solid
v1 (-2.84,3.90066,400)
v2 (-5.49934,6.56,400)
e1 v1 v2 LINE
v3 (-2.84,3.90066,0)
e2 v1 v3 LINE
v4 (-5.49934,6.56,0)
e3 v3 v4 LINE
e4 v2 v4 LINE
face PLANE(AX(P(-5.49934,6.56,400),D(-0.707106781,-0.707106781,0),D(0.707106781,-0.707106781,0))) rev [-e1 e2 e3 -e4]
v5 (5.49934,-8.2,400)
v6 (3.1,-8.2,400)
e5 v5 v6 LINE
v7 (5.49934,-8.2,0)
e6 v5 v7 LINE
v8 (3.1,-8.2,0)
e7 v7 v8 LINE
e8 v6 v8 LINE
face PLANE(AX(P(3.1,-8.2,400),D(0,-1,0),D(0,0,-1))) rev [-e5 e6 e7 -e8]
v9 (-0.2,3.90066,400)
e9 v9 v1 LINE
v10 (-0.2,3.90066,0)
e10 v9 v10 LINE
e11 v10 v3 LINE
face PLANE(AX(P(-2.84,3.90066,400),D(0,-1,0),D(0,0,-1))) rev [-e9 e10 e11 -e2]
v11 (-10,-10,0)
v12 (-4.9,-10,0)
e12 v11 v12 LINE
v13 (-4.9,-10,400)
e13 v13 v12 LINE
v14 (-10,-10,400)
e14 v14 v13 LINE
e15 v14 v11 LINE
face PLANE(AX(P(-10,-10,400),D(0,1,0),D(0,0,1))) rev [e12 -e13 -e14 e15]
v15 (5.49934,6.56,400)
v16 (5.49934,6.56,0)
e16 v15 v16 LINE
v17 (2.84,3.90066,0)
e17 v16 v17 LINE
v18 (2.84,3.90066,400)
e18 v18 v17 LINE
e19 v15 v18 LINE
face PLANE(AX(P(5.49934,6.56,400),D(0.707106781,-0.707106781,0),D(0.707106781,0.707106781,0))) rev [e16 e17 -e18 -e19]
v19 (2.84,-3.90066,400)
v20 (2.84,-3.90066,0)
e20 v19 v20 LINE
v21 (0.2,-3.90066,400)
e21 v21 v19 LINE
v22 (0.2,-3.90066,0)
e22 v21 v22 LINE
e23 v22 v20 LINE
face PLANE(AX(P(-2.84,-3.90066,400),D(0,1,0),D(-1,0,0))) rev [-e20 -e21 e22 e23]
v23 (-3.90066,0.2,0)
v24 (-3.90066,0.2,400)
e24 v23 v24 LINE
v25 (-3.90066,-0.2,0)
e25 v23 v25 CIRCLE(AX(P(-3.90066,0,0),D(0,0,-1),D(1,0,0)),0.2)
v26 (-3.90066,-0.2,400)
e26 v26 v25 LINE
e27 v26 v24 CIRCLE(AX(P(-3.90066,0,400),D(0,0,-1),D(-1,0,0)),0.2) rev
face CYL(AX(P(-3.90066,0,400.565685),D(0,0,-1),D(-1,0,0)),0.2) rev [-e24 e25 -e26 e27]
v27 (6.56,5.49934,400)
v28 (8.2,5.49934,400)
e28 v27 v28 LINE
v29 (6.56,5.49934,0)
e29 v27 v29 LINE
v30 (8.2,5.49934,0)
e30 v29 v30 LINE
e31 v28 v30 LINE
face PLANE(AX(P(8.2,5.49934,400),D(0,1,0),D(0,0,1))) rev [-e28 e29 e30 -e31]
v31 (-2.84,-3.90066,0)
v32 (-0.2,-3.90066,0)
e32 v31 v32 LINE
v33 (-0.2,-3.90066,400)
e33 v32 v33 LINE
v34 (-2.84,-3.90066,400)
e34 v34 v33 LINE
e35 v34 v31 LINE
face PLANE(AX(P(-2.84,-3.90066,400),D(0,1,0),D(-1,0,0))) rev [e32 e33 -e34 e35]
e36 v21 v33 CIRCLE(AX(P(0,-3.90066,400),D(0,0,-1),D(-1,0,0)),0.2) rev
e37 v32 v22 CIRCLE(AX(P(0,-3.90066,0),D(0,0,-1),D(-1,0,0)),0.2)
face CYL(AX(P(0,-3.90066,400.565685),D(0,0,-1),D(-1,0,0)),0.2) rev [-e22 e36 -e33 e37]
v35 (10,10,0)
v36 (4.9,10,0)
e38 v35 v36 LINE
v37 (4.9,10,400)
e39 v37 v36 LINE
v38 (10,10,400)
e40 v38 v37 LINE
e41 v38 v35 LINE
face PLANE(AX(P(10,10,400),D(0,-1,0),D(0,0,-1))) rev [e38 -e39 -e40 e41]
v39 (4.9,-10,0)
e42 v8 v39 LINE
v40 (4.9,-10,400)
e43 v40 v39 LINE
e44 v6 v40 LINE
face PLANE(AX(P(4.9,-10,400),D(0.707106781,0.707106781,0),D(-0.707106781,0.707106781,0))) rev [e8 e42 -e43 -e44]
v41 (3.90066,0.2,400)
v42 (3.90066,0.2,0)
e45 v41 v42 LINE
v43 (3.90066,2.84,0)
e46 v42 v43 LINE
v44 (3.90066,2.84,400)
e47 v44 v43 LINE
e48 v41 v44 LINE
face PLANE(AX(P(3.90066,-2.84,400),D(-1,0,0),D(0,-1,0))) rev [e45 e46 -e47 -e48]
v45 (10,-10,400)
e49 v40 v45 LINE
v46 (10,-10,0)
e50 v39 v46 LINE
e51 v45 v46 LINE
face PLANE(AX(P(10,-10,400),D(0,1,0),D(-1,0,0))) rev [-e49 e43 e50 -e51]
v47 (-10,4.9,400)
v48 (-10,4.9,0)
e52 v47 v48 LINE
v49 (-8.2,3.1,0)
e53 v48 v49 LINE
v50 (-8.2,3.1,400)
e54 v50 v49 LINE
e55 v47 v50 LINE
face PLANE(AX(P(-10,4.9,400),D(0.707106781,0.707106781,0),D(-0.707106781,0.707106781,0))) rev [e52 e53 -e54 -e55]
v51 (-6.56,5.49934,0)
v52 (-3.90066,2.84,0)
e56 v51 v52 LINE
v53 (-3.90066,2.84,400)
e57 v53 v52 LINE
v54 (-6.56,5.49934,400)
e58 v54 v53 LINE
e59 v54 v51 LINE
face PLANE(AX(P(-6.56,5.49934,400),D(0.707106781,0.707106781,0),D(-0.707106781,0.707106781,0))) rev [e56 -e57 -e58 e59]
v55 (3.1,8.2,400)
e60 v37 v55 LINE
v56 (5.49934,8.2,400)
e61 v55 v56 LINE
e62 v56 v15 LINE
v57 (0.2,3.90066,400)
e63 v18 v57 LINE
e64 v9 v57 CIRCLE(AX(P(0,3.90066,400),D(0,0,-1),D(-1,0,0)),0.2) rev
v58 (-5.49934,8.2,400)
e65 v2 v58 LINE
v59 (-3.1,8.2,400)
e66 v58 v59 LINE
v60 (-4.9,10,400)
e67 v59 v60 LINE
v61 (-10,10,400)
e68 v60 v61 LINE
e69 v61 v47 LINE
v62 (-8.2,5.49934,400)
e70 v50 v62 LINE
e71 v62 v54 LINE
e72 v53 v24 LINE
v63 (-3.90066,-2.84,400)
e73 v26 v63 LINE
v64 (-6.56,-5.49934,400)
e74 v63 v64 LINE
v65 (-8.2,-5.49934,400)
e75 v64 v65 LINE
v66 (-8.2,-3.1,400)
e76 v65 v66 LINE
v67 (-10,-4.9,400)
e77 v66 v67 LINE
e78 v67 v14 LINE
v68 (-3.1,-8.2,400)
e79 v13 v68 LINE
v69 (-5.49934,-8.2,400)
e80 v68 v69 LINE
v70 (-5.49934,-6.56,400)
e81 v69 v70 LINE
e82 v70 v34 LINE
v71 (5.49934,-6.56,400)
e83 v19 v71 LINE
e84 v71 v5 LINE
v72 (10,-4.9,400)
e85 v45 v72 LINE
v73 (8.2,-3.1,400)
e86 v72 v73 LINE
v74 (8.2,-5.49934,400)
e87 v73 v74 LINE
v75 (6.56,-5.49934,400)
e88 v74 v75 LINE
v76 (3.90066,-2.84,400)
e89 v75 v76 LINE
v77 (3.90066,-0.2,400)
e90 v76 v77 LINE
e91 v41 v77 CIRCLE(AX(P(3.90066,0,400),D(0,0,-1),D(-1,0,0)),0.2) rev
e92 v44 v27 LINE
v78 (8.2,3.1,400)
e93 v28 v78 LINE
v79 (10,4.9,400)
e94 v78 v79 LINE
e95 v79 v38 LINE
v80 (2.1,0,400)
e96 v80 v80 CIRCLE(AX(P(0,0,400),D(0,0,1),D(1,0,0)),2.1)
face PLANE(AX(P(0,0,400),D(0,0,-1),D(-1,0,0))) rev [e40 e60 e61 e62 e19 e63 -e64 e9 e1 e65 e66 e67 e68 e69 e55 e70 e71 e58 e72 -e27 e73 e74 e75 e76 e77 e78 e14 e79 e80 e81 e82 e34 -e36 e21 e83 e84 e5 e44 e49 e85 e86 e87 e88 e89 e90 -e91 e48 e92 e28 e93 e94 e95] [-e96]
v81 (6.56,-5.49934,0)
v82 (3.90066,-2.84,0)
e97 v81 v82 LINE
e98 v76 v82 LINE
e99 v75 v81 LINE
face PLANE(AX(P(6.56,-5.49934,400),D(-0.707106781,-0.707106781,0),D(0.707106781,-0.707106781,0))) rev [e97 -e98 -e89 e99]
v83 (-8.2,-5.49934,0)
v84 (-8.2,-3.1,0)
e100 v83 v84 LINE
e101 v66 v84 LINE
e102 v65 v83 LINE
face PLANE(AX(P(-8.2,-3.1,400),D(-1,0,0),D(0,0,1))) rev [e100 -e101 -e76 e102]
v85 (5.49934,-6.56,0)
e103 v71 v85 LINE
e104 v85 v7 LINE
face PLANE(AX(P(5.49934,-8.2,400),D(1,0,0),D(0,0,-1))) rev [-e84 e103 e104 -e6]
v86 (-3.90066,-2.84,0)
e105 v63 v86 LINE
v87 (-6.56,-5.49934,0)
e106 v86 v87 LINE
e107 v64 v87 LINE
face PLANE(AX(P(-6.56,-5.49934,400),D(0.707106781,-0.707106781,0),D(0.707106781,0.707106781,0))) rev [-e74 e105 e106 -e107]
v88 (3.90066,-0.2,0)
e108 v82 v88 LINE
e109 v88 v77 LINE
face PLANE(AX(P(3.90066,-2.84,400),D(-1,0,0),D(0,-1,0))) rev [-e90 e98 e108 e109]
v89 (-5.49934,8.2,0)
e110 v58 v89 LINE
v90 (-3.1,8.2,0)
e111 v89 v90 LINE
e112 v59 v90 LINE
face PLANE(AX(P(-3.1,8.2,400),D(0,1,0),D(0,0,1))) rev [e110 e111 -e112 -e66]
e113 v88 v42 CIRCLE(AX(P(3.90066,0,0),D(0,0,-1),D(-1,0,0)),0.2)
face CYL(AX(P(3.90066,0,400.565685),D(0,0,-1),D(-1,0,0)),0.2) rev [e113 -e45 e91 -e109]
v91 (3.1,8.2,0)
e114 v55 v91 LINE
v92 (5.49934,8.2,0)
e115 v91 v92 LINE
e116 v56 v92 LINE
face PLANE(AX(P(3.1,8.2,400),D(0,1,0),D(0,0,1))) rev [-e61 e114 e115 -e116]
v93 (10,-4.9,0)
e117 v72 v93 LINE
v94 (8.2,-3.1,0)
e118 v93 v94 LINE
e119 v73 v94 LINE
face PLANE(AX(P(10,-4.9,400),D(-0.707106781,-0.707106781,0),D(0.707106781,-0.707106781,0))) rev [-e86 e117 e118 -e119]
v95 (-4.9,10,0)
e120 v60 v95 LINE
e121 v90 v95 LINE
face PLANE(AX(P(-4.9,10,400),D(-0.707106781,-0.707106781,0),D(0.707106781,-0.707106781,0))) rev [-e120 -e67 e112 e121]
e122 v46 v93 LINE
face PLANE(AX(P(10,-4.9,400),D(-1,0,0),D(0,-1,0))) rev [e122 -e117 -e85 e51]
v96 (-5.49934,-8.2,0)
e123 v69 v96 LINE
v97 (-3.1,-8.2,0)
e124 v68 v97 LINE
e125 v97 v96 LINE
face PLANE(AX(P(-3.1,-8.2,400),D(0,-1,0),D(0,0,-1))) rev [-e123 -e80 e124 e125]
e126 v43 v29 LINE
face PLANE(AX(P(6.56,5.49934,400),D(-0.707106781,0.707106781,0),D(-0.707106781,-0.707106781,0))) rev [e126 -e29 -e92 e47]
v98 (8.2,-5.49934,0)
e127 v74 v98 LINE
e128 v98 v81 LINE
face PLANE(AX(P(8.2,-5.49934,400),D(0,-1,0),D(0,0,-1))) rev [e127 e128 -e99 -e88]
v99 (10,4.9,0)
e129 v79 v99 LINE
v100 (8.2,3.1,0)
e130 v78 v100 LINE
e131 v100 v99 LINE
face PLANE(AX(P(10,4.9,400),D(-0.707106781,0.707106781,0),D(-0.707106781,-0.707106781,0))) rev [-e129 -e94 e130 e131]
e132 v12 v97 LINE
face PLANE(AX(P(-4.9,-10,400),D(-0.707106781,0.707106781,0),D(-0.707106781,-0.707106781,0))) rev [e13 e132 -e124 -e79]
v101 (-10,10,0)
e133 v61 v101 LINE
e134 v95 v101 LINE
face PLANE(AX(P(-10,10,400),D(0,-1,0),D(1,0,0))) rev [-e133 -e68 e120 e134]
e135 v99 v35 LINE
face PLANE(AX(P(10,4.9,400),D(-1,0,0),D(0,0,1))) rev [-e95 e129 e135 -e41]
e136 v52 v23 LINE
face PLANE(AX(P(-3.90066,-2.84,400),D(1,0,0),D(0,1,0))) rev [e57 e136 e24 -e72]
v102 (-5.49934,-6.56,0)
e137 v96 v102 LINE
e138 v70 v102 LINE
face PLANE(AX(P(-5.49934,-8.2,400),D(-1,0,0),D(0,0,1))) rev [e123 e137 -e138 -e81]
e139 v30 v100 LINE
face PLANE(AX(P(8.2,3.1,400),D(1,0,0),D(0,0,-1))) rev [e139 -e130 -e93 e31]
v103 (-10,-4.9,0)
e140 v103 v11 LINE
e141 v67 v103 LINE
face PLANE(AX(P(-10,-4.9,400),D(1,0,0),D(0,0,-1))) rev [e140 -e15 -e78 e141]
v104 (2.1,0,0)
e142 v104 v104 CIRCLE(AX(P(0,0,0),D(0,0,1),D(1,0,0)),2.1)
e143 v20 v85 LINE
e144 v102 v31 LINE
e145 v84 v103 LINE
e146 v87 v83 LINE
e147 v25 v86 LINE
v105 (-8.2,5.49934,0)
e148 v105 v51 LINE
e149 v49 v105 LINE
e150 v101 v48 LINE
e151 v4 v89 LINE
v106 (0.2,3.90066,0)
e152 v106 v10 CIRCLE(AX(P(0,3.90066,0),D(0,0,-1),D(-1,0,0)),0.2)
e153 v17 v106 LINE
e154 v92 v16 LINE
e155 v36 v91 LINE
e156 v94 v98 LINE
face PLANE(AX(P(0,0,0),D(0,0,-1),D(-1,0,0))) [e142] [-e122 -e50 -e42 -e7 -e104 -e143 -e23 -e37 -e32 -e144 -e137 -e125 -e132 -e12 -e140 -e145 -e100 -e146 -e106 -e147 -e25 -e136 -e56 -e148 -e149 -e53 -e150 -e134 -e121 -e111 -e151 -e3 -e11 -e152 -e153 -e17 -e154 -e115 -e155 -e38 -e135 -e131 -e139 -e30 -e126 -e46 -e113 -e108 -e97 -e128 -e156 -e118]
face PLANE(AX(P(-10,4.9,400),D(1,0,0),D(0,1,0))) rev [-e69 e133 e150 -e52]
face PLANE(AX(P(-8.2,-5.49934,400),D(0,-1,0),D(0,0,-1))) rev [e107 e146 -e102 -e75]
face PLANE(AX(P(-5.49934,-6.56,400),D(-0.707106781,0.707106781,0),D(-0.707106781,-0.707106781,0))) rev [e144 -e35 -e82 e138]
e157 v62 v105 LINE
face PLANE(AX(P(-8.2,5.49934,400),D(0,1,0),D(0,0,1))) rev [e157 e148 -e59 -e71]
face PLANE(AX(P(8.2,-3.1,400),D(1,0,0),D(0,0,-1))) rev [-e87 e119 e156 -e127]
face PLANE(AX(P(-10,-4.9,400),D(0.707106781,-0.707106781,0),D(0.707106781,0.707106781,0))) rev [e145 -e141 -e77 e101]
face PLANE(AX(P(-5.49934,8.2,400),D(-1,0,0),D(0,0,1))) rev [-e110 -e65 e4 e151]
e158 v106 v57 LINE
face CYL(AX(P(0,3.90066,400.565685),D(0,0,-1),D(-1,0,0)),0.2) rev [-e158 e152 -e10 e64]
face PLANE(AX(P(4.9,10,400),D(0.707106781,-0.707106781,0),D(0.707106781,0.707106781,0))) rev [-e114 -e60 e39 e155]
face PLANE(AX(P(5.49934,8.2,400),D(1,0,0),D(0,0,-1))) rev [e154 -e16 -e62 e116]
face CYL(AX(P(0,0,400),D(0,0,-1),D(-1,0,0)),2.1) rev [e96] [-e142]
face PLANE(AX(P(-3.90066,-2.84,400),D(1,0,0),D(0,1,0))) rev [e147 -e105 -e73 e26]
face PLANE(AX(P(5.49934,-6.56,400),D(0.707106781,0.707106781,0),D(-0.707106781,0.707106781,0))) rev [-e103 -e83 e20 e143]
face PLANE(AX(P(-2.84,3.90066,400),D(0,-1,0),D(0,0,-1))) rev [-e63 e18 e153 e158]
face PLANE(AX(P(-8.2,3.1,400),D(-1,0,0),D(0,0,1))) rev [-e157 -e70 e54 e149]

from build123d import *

# Parameters (mm, degrees)
SKETCH1_R           = 2.1
BOSS_EXTRUDE1_DEPTH = 400
CUT_EXTRUDE1_DEPTH  = 400


# Read off the part's stored shape, not the designer's step: Cut-Extrude1
with BuildPart() as part:
    # Sketch1 → Boss-Extrude1 (new body)
    with BuildSketch(Plane.XY):
        Polygon((-10, -4.9), (-10, -10), (-4.9, -10), (-3.1, -8.2), (-5.499339828, -8.2), (-5.499339828, -6.56), (-2.84, -3.900660172), (2.84, -3.900660172), (5.499339828, -6.56), (5.499339828, -8.2), (3.1, -8.2), (4.9, -10), (10, -10), (10, -4.9), (8.2, -3.1), (8.2, -5.499339828), (6.56, -5.499339828), (3.900660172, -2.84), (3.900660172, 2.84), (6.56, 5.499339828), (8.2, 5.499339828), (8.2, 3.1), (10, 4.9), (10, 10), (4.9, 10), (3.1, 8.2), (5.499339828, 8.2), (5.499339828, 6.56), (2.84, 3.900660172), (-2.84, 3.900660172), (-5.499339828, 6.56), (-5.499339828, 8.2), (-3.1, 8.2), (-4.9, 10), (-10, 10), (-10, 4.9), (-8.2, 3.1), (-8.2, 5.499339828), (-6.56, 5.499339828), (-3.900660172, 2.84), (-3.900660172, -2.84), (-6.56, -5.499339828), (-8.2, -5.499339828), (-8.2, -3.1), align=None)
        Circle(SKETCH1_R, mode=Mode.SUBTRACT)
    extrude(amount=BOSS_EXTRUDE1_DEPTH)

    # Cut-Extrude1 outline → Cut-Extrude1 (cut)
    with BuildSketch(Plane.XY):
        with BuildLine():
            ThreePointArc((-3.900660172, -0.2), (-3.700660172, 0), (-3.900660172, 0.2))
            Line((-3.900660172, 0.2), (-3.900660172, -0.2))
        make_face()
        with BuildLine():
            ThreePointArc((-0.2, 3.900660172), (0, 3.700660172), (0.2, 3.900660172))
            Line((0.2, 3.900660172), (-0.2, 3.900660172))
        make_face()
        with BuildLine():
            ThreePointArc((3.900660172, 0.2), (3.700660172, 0), (3.900660172, -0.2))
            Line((3.900660172, -0.2), (3.900660172, 0.2))
        make_face()
        with BuildLine():
            ThreePointArc((0.2, -3.900660172), (0, -3.700660172), (-0.2, -3.900660172))
            Line((-0.2, -3.900660172), (0.2, -3.900660172))
        make_face()
    extrude(amount=CUT_EXTRUDE1_DEPTH, mode=Mode.SUBTRACT)


solid = part.part
